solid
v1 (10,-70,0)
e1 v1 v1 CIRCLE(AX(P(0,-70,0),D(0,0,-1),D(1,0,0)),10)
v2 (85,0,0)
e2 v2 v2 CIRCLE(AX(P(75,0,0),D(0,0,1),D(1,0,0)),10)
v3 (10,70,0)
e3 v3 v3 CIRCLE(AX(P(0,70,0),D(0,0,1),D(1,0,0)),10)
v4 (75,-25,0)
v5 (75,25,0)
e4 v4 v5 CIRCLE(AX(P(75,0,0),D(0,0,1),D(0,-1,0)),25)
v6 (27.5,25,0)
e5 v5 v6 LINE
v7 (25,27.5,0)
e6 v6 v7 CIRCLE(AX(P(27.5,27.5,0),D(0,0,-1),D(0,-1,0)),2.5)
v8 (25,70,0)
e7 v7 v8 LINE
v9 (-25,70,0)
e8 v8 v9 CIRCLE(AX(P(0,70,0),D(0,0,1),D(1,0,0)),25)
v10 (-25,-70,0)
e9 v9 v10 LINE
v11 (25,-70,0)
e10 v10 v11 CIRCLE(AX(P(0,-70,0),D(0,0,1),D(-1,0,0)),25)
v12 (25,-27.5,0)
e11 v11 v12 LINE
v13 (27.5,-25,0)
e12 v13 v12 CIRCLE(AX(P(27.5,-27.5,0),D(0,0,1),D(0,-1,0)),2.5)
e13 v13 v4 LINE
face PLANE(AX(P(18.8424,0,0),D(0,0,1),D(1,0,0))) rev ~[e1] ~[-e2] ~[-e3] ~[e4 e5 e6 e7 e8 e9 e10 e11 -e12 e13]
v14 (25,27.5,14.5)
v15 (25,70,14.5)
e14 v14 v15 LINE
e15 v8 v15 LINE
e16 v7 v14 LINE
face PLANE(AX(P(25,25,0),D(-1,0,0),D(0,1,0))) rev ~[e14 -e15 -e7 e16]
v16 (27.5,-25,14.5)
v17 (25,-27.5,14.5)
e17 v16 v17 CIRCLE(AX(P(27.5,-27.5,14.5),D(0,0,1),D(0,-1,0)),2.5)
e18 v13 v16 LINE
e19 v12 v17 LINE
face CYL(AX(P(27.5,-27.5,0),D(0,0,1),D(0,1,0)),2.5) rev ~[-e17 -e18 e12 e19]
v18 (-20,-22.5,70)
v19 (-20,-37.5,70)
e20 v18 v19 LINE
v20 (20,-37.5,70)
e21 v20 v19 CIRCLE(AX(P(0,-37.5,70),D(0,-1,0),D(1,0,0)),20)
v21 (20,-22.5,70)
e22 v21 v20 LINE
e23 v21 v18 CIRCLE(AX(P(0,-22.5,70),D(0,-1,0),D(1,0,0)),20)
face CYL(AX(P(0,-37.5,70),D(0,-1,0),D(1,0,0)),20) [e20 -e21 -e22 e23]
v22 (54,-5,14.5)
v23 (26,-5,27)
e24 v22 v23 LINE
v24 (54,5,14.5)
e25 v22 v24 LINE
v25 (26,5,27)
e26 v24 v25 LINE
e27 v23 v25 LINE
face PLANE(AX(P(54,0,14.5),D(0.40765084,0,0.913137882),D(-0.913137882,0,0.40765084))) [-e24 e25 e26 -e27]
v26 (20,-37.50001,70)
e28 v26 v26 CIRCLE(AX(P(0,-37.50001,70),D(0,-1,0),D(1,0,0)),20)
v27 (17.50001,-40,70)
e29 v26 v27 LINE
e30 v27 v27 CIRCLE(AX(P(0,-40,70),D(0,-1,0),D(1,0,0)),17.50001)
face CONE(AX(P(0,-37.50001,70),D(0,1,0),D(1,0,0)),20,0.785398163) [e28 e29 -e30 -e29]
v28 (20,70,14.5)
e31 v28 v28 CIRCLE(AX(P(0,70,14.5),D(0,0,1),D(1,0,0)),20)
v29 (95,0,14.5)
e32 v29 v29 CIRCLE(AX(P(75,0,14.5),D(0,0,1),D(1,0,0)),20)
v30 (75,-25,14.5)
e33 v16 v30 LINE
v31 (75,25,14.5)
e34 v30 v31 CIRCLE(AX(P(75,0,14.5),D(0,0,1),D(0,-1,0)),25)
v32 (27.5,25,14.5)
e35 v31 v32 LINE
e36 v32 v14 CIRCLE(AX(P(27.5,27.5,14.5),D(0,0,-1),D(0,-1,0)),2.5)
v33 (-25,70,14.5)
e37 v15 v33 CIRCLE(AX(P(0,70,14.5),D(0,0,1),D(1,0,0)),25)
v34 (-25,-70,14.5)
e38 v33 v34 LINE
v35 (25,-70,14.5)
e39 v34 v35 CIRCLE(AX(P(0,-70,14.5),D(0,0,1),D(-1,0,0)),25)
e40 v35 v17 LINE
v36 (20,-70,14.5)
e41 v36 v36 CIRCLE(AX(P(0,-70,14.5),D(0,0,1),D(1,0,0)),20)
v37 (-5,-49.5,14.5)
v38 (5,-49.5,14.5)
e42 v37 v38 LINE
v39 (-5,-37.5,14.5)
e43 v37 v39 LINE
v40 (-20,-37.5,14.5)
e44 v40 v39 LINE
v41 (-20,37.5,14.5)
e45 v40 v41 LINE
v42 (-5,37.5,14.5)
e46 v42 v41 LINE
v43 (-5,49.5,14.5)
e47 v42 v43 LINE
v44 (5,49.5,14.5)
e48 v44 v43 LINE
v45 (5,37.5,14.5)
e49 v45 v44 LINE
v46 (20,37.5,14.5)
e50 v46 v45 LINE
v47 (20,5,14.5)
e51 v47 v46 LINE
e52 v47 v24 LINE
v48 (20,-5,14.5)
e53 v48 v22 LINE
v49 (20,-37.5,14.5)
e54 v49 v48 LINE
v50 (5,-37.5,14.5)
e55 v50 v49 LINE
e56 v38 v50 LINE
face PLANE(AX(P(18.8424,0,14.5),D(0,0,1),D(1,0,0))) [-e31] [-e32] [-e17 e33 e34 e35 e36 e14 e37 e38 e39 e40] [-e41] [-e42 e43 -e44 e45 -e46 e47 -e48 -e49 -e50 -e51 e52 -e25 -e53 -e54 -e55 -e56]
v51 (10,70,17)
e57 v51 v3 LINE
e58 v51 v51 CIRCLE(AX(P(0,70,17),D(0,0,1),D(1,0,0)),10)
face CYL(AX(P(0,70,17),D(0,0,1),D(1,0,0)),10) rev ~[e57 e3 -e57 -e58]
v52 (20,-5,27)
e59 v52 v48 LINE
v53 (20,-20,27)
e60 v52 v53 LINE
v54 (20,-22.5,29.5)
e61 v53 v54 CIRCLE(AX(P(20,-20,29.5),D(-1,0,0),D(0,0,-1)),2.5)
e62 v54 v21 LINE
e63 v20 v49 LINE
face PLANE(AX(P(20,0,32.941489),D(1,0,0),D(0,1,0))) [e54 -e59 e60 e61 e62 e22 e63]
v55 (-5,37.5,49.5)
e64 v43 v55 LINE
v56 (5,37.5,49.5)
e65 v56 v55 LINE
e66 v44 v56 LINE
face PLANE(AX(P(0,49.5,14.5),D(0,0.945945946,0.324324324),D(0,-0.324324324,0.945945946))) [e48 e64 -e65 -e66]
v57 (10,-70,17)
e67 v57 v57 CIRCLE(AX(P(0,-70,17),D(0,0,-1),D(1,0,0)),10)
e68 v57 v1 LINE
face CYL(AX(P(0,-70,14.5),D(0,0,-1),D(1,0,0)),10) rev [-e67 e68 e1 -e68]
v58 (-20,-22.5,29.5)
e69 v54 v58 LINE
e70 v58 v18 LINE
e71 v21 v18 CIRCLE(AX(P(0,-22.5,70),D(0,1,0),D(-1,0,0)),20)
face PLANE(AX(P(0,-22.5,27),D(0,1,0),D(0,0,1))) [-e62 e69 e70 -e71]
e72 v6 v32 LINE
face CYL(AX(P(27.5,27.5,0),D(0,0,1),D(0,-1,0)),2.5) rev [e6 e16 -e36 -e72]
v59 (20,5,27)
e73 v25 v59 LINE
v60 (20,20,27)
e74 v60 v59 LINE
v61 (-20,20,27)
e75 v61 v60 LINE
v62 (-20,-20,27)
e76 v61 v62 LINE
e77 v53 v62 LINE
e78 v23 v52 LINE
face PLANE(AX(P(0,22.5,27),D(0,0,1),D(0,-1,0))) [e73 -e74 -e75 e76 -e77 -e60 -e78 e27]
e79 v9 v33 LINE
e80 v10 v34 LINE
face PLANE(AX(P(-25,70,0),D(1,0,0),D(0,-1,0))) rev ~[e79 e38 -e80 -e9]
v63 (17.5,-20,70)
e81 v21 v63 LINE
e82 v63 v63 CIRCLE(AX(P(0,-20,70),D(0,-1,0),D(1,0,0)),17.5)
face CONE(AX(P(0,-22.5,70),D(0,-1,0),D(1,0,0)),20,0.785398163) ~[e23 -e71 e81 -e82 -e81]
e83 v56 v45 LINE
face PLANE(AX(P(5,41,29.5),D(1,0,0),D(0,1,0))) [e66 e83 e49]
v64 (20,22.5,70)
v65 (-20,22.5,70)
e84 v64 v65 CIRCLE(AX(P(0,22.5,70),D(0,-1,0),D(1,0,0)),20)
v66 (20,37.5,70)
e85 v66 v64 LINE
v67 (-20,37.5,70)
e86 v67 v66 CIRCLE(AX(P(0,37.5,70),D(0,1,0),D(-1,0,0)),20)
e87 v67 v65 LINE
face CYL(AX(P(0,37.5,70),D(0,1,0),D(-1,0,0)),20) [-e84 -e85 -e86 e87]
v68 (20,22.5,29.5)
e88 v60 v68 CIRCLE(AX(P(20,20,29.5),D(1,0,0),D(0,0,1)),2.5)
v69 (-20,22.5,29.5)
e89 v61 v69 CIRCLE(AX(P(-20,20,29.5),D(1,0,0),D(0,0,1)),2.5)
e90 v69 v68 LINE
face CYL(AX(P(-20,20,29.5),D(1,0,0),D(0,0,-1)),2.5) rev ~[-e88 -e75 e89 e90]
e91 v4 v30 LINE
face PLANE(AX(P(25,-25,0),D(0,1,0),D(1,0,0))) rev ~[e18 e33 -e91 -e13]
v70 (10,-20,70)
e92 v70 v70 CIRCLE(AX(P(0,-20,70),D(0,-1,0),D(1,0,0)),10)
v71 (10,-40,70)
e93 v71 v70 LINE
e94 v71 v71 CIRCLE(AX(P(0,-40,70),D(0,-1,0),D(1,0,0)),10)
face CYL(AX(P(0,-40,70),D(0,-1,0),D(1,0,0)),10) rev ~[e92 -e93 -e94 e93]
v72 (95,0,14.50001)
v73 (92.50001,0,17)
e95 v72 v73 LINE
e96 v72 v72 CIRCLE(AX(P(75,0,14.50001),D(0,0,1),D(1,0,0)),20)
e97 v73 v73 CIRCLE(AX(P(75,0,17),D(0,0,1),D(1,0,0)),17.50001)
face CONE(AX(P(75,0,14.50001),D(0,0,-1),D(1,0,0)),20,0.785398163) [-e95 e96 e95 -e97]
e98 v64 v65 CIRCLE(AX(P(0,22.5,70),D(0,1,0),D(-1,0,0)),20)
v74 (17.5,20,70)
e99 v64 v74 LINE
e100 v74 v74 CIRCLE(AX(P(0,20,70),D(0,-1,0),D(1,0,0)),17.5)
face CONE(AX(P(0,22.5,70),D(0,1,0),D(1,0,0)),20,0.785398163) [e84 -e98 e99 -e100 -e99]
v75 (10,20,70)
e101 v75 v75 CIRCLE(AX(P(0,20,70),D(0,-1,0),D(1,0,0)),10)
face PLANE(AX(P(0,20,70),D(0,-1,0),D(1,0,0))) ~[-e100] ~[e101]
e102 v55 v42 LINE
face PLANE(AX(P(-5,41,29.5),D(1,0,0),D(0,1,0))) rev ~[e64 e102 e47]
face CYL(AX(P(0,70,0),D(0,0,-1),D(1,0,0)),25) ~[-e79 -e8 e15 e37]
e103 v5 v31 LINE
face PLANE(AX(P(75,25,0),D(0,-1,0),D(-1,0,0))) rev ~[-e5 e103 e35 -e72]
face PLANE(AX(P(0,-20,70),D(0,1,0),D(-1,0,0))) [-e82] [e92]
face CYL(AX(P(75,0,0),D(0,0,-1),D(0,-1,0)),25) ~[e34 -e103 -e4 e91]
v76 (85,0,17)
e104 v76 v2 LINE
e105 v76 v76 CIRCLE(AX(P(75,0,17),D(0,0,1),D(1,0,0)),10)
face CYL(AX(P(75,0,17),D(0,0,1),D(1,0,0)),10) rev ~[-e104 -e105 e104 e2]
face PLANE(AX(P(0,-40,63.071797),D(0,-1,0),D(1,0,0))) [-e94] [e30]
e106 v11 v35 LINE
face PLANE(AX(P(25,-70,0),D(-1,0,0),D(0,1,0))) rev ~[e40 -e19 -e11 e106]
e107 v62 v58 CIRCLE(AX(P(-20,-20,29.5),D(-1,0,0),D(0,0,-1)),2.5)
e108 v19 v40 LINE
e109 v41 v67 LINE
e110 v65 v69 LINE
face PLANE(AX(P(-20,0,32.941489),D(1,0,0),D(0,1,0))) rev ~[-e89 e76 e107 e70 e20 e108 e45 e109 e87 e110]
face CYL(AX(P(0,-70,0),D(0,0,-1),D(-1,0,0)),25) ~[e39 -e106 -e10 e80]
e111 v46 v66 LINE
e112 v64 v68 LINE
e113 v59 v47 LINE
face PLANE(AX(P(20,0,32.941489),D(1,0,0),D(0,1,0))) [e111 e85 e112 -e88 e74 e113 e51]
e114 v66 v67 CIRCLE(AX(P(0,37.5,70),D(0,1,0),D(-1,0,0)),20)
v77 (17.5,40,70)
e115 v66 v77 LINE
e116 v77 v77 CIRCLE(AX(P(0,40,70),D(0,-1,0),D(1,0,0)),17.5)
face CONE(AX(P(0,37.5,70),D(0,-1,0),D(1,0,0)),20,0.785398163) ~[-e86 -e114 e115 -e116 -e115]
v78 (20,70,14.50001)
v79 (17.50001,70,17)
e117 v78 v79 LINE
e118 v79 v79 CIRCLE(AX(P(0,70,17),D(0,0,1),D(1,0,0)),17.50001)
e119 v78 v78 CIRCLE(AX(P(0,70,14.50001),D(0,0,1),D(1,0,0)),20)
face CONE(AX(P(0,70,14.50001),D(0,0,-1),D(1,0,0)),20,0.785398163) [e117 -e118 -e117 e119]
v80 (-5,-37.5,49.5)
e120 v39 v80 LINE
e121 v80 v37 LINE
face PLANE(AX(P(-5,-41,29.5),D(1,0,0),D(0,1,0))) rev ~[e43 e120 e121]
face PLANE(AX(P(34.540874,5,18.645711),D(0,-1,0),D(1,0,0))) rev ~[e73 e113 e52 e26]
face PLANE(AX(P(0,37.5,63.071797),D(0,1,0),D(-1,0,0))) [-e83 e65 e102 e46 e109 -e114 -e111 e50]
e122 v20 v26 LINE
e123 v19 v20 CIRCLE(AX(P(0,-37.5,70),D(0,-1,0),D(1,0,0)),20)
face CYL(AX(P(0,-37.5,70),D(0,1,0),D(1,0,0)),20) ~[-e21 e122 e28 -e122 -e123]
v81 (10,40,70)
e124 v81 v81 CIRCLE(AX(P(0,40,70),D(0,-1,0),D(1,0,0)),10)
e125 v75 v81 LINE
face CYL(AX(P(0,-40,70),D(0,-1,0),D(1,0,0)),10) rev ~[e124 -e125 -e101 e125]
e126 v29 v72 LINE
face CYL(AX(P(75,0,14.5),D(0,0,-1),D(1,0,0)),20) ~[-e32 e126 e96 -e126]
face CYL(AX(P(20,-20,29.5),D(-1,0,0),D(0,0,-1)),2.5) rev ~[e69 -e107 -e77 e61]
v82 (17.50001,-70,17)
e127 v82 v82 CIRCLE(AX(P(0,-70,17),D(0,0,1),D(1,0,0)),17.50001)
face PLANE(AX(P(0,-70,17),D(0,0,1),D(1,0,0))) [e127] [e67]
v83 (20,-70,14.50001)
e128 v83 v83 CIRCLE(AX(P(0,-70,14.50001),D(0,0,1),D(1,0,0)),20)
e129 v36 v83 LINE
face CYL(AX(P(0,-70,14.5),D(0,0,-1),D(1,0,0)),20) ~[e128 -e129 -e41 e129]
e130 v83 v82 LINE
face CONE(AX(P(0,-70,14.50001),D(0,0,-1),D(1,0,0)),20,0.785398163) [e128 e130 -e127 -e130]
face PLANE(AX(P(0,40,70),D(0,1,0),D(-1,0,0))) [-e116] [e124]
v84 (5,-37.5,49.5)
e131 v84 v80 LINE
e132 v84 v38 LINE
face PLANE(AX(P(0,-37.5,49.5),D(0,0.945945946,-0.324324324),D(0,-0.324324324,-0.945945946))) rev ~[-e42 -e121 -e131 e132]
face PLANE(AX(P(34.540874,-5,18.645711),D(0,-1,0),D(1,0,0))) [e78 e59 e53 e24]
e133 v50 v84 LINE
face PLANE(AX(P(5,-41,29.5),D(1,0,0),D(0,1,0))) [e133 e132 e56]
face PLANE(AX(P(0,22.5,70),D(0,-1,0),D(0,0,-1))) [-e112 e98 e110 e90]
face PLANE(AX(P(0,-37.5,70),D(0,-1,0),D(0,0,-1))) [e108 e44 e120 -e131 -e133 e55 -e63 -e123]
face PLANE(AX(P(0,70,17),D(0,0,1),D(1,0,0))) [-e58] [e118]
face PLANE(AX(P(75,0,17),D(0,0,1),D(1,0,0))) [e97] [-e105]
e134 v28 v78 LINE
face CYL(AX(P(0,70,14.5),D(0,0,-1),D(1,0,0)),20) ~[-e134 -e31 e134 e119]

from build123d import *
from build123d import SkipClean  # not in build123d's __all__

# Parameters (mm, degrees)
F1_DEPTH  = 14.5
F3_DEPTH  = 20
F5_DEPTH  = 5
F7_DEPTH  = 5
F9_DEPTH  = 2.5
F10_DEPTH = 15
F12_DEPTH = 2.5
F14_SIZE  = 2.49999
F16_DEPTH = 15
F18_DEPTH = 2.5
F22_R     = 20
F23_DEPTH = 2.5
F24_SIZE  = 2.49999
F25_R     = 10
F26_DEPTH = 17.001
F27_R     = 10
F28_DEPTH = 17.001
F29_R     = 10
F30_DEPTH = 135.001
F31_R     = 10
F32_DEPTH = 75.501
F33_R     = 10
F34_DEPTH = 90.001
F35_R     = 2.5


# Not quite as in the source:
# - a fillet or chamfer that OpenCascade refuses, or shapes differently, is made with other operations: its cross-section is extruded or revolved along the edge and cut away or added
# - a fillet or chamfer is up to 0.001 mm smaller than in the source, because OpenCascade refuses the exact size
# - a feature of the source that left no trace in its solid (it failed there, or was rolled back) is left out
# - a pattern or mirror of a feature is missing from the dataset's text; its kind, count and spacing are read off the source's solid


with BuildPart() as f1:
    # F0 (on Top) → F1 (new body)
    with BuildSketch(Plane.XY):
        with BuildLine():
            ThreePointArc((25, 70), (0, 95), (-25, 70))
            Line((-25, 70), (-25, -70))
            ThreePointArc((-25, -70), (0, -95), (25, -70))
            Line((25, -70), (25, -25))
            Line((25, -25), (75, -25))
            ThreePointArc((75, -25), (100, 0), (75, 25))
            Line((75, 25), (25, 25))
            Line((25, 25), (25, 70))
        make_face()
    extrude(amount=F1_DEPTH)

    # F2 (on Right) → F3 (join, symmetric)
    with BuildSketch(Plane.YZ):
        Polygon((-37.5, 70), (-37.5, 0), (37.5, 0), (37.5, 70), (22.5, 70), (22.5, 27), (-22.5, 27), (-22.5, 70), align=None)
    extrude(amount=F3_DEPTH, both=True)

    # F4 (on Right) → F5 (join, symmetric)
    with BuildSketch(Plane.YZ):
        Polygon((-37.5, 49.5), (-49.5, 14.5), (-37.5, 14.5), align=None)
        Polygon((37.5, 49.5), (37.5, 14.5), (49.5, 14.5), align=None)
    extrude(amount=F5_DEPTH, both=True)

    # F6 (on Front) → F7 (join, symmetric)
    with BuildSketch(Plane.XZ):
        Polygon((26, 27), (20, 27), (20, 14.5), (54, 14.5), align=None)
    extrude(amount=F7_DEPTH, both=True)

    # F8 (on face) → F9 (join)
    with BuildSketch(Plane.XZ.offset(37.5)):
        with BuildLine():
            ThreePointArc((-20, 70), (0, 50), (20, 70))
            Line((20, 70), (-20, 70))
        make_face()
        with BuildLine():
            Line((-20, 70), (20, 70))
            ThreePointArc((20, 70), (0, 90), (-20, 70))
        make_face()
    extrude(amount=F9_DEPTH)

    # F10 (add): a face of the model
    f10_faces = [f1.faces().sort_by_distance(p)[0] for p in [
        (0, -37.5, 78.4882636316),
    ]]
    extrude(f10_faces, amount=F10_DEPTH)

    # F11 (on face) → F12 (join)
    with BuildSketch(Plane(origin=(0, -22.5, 0), x_dir=(-1, 0, 0), z_dir=(0, 1, 0))):
        with BuildLine():
            ThreePointArc((-20, 70), (0, 50), (20, 70))
            ThreePointArc((20, 70), (0, 90), (-20, 70))
        make_face()
    f12 = extrude(amount=F12_DEPTH)

    # F12_copies: F12 across plane
    add(f12.mirror(Plane.ZX), clean=False)

    # F13: chamfer of 2.5 on 1 edges, made by hand

    # F13_s1 → F13_t2 (revolve, cut)
    with BuildSketch(Plane.XY.offset(70)):
        Polygon((20, -22.5), (17.5, -20), (20, -20), align=None)
    revolve(axis=Axis((0, -20, 70), (0, -1, 0)), mode=Mode.SUBTRACT)

    # F14 (size 2.5 in the source; OpenCascade refuses exactly that, so slightly less here)
    f14_edges = [f1.edges().sort_by_distance(p)[0] for p in [
        (-20, -40, 70),
    ]]
    chamfer(f14_edges, length=F14_SIZE)

    # F15 (on face) → F16 (join)
    with BuildSketch(Plane(origin=(0, 37.5, 0), x_dir=(-1, 0, 0), z_dir=(0, 1, 0))):
        with BuildLine():
            ThreePointArc((-20, 70), (0, 50), (20, 70))
            Line((20, 70), (-20, 70))
        make_face()
        with BuildLine():
            Line((-20, 70), (20, 70))
            ThreePointArc((20, 70), (0, 90), (-20, 70))
        make_face()
    extrude(amount=-F16_DEPTH)

    # F17 (on face) → F18 (join)
    with BuildSketch(Plane(origin=(0, 37.5, 0), x_dir=(-1, 0, 0), z_dir=(0, 1, 0))):
        with BuildLine():
            ThreePointArc((-20, 70), (0, 50), (20, 70))
            ThreePointArc((20, 70), (0, 90), (-20, 70))
        make_face()
    with SkipClean():  # cleaning this boolean's faces spoils the solid; the shape is the same uncleaned
        extrude(amount=F18_DEPTH)

    # F21: chamfer of 2.5 on 2 edges, made by hand

    # F21_s1 → F21_t2 (revolve, cut)
    with BuildSketch(Plane.XY.offset(70)):
        Polygon((20, 37.5), (17.5, 40), (20, 40), align=None)
    revolve(axis=Axis((0, 40, 70), (0, -1, 0)), mode=Mode.SUBTRACT)

    # F21_s3 → F21_t4 (revolve, cut)
    with BuildSketch(Plane.XY.offset(70)):
        Polygon((20, 22.5), (17.5, 20), (20, 20), align=None)
    revolve(axis=Axis((0, 20, 70), (0, -1, 0)), mode=Mode.SUBTRACT)

    # F22 (on face) → F23 (join)
    with BuildSketch(Plane.XY.offset(14.5)):
        with Locations((0, 70)):
            Circle(F22_R)
        with Locations((75, 0)):
            Circle(F22_R)
        with Locations((0, -70)):
            Circle(F22_R)
    extrude(amount=F23_DEPTH)

    # F24 (size 2.5 in the source; OpenCascade refuses exactly that, so slightly less here)
    f24_edges = [f1.edges().sort_by_distance(p)[0] for p in [
        (-20, 70, 17),
        (55, 0, 17),
        (-20, -70, 17),
    ]]
    chamfer(f24_edges, length=F24_SIZE)

    # F25 (on face) → F26 (cut, through all)
    with BuildSketch(Plane.XY.offset(17)):
        with Locations((0, 70)):
            Circle(F25_R)
    extrude(amount=-F26_DEPTH, mode=Mode.SUBTRACT)

    # F27 (on face) → F28 (cut, through all)
    with BuildSketch(Plane.XY.offset(17)):
        with Locations((75, 0)):
            Circle(F27_R)
    extrude(amount=-F28_DEPTH, mode=Mode.SUBTRACT)

    # F29 (on face) → F30 (cut, through all)
    with BuildSketch(Plane.XZ.offset(40)):
        with Locations((0, 70)):
            Circle(F29_R)
    extrude(amount=-F30_DEPTH, mode=Mode.SUBTRACT)

    # F31 (on face) → F32 (cut, through all)
    with BuildSketch(Plane.XY.offset(14.5)):
        with Locations((0, -70)):
            Circle(F31_R)
    extrude(amount=F32_DEPTH, mode=Mode.SUBTRACT)

    # F33 (on face) → F34 (cut, through all)
    with BuildSketch(Plane(origin=(0, 0, 0), x_dir=(1, 0, 0), z_dir=(0, 0, -1))):
        with Locations((0, 70)):
            Circle(F33_R)
    extrude(amount=-F34_DEPTH, mode=Mode.SUBTRACT)

    # F35
    f35_edges = [f1.edges().sort_by_distance(p)[0] for p in [
        (0, 22.5, 27),
        (0, -22.5, 27),
        (25, 25, 7.25),
        (25, -25, 7.25),
    ]]
    fillet(f35_edges, radius=F35_R)


solid = f1.part
